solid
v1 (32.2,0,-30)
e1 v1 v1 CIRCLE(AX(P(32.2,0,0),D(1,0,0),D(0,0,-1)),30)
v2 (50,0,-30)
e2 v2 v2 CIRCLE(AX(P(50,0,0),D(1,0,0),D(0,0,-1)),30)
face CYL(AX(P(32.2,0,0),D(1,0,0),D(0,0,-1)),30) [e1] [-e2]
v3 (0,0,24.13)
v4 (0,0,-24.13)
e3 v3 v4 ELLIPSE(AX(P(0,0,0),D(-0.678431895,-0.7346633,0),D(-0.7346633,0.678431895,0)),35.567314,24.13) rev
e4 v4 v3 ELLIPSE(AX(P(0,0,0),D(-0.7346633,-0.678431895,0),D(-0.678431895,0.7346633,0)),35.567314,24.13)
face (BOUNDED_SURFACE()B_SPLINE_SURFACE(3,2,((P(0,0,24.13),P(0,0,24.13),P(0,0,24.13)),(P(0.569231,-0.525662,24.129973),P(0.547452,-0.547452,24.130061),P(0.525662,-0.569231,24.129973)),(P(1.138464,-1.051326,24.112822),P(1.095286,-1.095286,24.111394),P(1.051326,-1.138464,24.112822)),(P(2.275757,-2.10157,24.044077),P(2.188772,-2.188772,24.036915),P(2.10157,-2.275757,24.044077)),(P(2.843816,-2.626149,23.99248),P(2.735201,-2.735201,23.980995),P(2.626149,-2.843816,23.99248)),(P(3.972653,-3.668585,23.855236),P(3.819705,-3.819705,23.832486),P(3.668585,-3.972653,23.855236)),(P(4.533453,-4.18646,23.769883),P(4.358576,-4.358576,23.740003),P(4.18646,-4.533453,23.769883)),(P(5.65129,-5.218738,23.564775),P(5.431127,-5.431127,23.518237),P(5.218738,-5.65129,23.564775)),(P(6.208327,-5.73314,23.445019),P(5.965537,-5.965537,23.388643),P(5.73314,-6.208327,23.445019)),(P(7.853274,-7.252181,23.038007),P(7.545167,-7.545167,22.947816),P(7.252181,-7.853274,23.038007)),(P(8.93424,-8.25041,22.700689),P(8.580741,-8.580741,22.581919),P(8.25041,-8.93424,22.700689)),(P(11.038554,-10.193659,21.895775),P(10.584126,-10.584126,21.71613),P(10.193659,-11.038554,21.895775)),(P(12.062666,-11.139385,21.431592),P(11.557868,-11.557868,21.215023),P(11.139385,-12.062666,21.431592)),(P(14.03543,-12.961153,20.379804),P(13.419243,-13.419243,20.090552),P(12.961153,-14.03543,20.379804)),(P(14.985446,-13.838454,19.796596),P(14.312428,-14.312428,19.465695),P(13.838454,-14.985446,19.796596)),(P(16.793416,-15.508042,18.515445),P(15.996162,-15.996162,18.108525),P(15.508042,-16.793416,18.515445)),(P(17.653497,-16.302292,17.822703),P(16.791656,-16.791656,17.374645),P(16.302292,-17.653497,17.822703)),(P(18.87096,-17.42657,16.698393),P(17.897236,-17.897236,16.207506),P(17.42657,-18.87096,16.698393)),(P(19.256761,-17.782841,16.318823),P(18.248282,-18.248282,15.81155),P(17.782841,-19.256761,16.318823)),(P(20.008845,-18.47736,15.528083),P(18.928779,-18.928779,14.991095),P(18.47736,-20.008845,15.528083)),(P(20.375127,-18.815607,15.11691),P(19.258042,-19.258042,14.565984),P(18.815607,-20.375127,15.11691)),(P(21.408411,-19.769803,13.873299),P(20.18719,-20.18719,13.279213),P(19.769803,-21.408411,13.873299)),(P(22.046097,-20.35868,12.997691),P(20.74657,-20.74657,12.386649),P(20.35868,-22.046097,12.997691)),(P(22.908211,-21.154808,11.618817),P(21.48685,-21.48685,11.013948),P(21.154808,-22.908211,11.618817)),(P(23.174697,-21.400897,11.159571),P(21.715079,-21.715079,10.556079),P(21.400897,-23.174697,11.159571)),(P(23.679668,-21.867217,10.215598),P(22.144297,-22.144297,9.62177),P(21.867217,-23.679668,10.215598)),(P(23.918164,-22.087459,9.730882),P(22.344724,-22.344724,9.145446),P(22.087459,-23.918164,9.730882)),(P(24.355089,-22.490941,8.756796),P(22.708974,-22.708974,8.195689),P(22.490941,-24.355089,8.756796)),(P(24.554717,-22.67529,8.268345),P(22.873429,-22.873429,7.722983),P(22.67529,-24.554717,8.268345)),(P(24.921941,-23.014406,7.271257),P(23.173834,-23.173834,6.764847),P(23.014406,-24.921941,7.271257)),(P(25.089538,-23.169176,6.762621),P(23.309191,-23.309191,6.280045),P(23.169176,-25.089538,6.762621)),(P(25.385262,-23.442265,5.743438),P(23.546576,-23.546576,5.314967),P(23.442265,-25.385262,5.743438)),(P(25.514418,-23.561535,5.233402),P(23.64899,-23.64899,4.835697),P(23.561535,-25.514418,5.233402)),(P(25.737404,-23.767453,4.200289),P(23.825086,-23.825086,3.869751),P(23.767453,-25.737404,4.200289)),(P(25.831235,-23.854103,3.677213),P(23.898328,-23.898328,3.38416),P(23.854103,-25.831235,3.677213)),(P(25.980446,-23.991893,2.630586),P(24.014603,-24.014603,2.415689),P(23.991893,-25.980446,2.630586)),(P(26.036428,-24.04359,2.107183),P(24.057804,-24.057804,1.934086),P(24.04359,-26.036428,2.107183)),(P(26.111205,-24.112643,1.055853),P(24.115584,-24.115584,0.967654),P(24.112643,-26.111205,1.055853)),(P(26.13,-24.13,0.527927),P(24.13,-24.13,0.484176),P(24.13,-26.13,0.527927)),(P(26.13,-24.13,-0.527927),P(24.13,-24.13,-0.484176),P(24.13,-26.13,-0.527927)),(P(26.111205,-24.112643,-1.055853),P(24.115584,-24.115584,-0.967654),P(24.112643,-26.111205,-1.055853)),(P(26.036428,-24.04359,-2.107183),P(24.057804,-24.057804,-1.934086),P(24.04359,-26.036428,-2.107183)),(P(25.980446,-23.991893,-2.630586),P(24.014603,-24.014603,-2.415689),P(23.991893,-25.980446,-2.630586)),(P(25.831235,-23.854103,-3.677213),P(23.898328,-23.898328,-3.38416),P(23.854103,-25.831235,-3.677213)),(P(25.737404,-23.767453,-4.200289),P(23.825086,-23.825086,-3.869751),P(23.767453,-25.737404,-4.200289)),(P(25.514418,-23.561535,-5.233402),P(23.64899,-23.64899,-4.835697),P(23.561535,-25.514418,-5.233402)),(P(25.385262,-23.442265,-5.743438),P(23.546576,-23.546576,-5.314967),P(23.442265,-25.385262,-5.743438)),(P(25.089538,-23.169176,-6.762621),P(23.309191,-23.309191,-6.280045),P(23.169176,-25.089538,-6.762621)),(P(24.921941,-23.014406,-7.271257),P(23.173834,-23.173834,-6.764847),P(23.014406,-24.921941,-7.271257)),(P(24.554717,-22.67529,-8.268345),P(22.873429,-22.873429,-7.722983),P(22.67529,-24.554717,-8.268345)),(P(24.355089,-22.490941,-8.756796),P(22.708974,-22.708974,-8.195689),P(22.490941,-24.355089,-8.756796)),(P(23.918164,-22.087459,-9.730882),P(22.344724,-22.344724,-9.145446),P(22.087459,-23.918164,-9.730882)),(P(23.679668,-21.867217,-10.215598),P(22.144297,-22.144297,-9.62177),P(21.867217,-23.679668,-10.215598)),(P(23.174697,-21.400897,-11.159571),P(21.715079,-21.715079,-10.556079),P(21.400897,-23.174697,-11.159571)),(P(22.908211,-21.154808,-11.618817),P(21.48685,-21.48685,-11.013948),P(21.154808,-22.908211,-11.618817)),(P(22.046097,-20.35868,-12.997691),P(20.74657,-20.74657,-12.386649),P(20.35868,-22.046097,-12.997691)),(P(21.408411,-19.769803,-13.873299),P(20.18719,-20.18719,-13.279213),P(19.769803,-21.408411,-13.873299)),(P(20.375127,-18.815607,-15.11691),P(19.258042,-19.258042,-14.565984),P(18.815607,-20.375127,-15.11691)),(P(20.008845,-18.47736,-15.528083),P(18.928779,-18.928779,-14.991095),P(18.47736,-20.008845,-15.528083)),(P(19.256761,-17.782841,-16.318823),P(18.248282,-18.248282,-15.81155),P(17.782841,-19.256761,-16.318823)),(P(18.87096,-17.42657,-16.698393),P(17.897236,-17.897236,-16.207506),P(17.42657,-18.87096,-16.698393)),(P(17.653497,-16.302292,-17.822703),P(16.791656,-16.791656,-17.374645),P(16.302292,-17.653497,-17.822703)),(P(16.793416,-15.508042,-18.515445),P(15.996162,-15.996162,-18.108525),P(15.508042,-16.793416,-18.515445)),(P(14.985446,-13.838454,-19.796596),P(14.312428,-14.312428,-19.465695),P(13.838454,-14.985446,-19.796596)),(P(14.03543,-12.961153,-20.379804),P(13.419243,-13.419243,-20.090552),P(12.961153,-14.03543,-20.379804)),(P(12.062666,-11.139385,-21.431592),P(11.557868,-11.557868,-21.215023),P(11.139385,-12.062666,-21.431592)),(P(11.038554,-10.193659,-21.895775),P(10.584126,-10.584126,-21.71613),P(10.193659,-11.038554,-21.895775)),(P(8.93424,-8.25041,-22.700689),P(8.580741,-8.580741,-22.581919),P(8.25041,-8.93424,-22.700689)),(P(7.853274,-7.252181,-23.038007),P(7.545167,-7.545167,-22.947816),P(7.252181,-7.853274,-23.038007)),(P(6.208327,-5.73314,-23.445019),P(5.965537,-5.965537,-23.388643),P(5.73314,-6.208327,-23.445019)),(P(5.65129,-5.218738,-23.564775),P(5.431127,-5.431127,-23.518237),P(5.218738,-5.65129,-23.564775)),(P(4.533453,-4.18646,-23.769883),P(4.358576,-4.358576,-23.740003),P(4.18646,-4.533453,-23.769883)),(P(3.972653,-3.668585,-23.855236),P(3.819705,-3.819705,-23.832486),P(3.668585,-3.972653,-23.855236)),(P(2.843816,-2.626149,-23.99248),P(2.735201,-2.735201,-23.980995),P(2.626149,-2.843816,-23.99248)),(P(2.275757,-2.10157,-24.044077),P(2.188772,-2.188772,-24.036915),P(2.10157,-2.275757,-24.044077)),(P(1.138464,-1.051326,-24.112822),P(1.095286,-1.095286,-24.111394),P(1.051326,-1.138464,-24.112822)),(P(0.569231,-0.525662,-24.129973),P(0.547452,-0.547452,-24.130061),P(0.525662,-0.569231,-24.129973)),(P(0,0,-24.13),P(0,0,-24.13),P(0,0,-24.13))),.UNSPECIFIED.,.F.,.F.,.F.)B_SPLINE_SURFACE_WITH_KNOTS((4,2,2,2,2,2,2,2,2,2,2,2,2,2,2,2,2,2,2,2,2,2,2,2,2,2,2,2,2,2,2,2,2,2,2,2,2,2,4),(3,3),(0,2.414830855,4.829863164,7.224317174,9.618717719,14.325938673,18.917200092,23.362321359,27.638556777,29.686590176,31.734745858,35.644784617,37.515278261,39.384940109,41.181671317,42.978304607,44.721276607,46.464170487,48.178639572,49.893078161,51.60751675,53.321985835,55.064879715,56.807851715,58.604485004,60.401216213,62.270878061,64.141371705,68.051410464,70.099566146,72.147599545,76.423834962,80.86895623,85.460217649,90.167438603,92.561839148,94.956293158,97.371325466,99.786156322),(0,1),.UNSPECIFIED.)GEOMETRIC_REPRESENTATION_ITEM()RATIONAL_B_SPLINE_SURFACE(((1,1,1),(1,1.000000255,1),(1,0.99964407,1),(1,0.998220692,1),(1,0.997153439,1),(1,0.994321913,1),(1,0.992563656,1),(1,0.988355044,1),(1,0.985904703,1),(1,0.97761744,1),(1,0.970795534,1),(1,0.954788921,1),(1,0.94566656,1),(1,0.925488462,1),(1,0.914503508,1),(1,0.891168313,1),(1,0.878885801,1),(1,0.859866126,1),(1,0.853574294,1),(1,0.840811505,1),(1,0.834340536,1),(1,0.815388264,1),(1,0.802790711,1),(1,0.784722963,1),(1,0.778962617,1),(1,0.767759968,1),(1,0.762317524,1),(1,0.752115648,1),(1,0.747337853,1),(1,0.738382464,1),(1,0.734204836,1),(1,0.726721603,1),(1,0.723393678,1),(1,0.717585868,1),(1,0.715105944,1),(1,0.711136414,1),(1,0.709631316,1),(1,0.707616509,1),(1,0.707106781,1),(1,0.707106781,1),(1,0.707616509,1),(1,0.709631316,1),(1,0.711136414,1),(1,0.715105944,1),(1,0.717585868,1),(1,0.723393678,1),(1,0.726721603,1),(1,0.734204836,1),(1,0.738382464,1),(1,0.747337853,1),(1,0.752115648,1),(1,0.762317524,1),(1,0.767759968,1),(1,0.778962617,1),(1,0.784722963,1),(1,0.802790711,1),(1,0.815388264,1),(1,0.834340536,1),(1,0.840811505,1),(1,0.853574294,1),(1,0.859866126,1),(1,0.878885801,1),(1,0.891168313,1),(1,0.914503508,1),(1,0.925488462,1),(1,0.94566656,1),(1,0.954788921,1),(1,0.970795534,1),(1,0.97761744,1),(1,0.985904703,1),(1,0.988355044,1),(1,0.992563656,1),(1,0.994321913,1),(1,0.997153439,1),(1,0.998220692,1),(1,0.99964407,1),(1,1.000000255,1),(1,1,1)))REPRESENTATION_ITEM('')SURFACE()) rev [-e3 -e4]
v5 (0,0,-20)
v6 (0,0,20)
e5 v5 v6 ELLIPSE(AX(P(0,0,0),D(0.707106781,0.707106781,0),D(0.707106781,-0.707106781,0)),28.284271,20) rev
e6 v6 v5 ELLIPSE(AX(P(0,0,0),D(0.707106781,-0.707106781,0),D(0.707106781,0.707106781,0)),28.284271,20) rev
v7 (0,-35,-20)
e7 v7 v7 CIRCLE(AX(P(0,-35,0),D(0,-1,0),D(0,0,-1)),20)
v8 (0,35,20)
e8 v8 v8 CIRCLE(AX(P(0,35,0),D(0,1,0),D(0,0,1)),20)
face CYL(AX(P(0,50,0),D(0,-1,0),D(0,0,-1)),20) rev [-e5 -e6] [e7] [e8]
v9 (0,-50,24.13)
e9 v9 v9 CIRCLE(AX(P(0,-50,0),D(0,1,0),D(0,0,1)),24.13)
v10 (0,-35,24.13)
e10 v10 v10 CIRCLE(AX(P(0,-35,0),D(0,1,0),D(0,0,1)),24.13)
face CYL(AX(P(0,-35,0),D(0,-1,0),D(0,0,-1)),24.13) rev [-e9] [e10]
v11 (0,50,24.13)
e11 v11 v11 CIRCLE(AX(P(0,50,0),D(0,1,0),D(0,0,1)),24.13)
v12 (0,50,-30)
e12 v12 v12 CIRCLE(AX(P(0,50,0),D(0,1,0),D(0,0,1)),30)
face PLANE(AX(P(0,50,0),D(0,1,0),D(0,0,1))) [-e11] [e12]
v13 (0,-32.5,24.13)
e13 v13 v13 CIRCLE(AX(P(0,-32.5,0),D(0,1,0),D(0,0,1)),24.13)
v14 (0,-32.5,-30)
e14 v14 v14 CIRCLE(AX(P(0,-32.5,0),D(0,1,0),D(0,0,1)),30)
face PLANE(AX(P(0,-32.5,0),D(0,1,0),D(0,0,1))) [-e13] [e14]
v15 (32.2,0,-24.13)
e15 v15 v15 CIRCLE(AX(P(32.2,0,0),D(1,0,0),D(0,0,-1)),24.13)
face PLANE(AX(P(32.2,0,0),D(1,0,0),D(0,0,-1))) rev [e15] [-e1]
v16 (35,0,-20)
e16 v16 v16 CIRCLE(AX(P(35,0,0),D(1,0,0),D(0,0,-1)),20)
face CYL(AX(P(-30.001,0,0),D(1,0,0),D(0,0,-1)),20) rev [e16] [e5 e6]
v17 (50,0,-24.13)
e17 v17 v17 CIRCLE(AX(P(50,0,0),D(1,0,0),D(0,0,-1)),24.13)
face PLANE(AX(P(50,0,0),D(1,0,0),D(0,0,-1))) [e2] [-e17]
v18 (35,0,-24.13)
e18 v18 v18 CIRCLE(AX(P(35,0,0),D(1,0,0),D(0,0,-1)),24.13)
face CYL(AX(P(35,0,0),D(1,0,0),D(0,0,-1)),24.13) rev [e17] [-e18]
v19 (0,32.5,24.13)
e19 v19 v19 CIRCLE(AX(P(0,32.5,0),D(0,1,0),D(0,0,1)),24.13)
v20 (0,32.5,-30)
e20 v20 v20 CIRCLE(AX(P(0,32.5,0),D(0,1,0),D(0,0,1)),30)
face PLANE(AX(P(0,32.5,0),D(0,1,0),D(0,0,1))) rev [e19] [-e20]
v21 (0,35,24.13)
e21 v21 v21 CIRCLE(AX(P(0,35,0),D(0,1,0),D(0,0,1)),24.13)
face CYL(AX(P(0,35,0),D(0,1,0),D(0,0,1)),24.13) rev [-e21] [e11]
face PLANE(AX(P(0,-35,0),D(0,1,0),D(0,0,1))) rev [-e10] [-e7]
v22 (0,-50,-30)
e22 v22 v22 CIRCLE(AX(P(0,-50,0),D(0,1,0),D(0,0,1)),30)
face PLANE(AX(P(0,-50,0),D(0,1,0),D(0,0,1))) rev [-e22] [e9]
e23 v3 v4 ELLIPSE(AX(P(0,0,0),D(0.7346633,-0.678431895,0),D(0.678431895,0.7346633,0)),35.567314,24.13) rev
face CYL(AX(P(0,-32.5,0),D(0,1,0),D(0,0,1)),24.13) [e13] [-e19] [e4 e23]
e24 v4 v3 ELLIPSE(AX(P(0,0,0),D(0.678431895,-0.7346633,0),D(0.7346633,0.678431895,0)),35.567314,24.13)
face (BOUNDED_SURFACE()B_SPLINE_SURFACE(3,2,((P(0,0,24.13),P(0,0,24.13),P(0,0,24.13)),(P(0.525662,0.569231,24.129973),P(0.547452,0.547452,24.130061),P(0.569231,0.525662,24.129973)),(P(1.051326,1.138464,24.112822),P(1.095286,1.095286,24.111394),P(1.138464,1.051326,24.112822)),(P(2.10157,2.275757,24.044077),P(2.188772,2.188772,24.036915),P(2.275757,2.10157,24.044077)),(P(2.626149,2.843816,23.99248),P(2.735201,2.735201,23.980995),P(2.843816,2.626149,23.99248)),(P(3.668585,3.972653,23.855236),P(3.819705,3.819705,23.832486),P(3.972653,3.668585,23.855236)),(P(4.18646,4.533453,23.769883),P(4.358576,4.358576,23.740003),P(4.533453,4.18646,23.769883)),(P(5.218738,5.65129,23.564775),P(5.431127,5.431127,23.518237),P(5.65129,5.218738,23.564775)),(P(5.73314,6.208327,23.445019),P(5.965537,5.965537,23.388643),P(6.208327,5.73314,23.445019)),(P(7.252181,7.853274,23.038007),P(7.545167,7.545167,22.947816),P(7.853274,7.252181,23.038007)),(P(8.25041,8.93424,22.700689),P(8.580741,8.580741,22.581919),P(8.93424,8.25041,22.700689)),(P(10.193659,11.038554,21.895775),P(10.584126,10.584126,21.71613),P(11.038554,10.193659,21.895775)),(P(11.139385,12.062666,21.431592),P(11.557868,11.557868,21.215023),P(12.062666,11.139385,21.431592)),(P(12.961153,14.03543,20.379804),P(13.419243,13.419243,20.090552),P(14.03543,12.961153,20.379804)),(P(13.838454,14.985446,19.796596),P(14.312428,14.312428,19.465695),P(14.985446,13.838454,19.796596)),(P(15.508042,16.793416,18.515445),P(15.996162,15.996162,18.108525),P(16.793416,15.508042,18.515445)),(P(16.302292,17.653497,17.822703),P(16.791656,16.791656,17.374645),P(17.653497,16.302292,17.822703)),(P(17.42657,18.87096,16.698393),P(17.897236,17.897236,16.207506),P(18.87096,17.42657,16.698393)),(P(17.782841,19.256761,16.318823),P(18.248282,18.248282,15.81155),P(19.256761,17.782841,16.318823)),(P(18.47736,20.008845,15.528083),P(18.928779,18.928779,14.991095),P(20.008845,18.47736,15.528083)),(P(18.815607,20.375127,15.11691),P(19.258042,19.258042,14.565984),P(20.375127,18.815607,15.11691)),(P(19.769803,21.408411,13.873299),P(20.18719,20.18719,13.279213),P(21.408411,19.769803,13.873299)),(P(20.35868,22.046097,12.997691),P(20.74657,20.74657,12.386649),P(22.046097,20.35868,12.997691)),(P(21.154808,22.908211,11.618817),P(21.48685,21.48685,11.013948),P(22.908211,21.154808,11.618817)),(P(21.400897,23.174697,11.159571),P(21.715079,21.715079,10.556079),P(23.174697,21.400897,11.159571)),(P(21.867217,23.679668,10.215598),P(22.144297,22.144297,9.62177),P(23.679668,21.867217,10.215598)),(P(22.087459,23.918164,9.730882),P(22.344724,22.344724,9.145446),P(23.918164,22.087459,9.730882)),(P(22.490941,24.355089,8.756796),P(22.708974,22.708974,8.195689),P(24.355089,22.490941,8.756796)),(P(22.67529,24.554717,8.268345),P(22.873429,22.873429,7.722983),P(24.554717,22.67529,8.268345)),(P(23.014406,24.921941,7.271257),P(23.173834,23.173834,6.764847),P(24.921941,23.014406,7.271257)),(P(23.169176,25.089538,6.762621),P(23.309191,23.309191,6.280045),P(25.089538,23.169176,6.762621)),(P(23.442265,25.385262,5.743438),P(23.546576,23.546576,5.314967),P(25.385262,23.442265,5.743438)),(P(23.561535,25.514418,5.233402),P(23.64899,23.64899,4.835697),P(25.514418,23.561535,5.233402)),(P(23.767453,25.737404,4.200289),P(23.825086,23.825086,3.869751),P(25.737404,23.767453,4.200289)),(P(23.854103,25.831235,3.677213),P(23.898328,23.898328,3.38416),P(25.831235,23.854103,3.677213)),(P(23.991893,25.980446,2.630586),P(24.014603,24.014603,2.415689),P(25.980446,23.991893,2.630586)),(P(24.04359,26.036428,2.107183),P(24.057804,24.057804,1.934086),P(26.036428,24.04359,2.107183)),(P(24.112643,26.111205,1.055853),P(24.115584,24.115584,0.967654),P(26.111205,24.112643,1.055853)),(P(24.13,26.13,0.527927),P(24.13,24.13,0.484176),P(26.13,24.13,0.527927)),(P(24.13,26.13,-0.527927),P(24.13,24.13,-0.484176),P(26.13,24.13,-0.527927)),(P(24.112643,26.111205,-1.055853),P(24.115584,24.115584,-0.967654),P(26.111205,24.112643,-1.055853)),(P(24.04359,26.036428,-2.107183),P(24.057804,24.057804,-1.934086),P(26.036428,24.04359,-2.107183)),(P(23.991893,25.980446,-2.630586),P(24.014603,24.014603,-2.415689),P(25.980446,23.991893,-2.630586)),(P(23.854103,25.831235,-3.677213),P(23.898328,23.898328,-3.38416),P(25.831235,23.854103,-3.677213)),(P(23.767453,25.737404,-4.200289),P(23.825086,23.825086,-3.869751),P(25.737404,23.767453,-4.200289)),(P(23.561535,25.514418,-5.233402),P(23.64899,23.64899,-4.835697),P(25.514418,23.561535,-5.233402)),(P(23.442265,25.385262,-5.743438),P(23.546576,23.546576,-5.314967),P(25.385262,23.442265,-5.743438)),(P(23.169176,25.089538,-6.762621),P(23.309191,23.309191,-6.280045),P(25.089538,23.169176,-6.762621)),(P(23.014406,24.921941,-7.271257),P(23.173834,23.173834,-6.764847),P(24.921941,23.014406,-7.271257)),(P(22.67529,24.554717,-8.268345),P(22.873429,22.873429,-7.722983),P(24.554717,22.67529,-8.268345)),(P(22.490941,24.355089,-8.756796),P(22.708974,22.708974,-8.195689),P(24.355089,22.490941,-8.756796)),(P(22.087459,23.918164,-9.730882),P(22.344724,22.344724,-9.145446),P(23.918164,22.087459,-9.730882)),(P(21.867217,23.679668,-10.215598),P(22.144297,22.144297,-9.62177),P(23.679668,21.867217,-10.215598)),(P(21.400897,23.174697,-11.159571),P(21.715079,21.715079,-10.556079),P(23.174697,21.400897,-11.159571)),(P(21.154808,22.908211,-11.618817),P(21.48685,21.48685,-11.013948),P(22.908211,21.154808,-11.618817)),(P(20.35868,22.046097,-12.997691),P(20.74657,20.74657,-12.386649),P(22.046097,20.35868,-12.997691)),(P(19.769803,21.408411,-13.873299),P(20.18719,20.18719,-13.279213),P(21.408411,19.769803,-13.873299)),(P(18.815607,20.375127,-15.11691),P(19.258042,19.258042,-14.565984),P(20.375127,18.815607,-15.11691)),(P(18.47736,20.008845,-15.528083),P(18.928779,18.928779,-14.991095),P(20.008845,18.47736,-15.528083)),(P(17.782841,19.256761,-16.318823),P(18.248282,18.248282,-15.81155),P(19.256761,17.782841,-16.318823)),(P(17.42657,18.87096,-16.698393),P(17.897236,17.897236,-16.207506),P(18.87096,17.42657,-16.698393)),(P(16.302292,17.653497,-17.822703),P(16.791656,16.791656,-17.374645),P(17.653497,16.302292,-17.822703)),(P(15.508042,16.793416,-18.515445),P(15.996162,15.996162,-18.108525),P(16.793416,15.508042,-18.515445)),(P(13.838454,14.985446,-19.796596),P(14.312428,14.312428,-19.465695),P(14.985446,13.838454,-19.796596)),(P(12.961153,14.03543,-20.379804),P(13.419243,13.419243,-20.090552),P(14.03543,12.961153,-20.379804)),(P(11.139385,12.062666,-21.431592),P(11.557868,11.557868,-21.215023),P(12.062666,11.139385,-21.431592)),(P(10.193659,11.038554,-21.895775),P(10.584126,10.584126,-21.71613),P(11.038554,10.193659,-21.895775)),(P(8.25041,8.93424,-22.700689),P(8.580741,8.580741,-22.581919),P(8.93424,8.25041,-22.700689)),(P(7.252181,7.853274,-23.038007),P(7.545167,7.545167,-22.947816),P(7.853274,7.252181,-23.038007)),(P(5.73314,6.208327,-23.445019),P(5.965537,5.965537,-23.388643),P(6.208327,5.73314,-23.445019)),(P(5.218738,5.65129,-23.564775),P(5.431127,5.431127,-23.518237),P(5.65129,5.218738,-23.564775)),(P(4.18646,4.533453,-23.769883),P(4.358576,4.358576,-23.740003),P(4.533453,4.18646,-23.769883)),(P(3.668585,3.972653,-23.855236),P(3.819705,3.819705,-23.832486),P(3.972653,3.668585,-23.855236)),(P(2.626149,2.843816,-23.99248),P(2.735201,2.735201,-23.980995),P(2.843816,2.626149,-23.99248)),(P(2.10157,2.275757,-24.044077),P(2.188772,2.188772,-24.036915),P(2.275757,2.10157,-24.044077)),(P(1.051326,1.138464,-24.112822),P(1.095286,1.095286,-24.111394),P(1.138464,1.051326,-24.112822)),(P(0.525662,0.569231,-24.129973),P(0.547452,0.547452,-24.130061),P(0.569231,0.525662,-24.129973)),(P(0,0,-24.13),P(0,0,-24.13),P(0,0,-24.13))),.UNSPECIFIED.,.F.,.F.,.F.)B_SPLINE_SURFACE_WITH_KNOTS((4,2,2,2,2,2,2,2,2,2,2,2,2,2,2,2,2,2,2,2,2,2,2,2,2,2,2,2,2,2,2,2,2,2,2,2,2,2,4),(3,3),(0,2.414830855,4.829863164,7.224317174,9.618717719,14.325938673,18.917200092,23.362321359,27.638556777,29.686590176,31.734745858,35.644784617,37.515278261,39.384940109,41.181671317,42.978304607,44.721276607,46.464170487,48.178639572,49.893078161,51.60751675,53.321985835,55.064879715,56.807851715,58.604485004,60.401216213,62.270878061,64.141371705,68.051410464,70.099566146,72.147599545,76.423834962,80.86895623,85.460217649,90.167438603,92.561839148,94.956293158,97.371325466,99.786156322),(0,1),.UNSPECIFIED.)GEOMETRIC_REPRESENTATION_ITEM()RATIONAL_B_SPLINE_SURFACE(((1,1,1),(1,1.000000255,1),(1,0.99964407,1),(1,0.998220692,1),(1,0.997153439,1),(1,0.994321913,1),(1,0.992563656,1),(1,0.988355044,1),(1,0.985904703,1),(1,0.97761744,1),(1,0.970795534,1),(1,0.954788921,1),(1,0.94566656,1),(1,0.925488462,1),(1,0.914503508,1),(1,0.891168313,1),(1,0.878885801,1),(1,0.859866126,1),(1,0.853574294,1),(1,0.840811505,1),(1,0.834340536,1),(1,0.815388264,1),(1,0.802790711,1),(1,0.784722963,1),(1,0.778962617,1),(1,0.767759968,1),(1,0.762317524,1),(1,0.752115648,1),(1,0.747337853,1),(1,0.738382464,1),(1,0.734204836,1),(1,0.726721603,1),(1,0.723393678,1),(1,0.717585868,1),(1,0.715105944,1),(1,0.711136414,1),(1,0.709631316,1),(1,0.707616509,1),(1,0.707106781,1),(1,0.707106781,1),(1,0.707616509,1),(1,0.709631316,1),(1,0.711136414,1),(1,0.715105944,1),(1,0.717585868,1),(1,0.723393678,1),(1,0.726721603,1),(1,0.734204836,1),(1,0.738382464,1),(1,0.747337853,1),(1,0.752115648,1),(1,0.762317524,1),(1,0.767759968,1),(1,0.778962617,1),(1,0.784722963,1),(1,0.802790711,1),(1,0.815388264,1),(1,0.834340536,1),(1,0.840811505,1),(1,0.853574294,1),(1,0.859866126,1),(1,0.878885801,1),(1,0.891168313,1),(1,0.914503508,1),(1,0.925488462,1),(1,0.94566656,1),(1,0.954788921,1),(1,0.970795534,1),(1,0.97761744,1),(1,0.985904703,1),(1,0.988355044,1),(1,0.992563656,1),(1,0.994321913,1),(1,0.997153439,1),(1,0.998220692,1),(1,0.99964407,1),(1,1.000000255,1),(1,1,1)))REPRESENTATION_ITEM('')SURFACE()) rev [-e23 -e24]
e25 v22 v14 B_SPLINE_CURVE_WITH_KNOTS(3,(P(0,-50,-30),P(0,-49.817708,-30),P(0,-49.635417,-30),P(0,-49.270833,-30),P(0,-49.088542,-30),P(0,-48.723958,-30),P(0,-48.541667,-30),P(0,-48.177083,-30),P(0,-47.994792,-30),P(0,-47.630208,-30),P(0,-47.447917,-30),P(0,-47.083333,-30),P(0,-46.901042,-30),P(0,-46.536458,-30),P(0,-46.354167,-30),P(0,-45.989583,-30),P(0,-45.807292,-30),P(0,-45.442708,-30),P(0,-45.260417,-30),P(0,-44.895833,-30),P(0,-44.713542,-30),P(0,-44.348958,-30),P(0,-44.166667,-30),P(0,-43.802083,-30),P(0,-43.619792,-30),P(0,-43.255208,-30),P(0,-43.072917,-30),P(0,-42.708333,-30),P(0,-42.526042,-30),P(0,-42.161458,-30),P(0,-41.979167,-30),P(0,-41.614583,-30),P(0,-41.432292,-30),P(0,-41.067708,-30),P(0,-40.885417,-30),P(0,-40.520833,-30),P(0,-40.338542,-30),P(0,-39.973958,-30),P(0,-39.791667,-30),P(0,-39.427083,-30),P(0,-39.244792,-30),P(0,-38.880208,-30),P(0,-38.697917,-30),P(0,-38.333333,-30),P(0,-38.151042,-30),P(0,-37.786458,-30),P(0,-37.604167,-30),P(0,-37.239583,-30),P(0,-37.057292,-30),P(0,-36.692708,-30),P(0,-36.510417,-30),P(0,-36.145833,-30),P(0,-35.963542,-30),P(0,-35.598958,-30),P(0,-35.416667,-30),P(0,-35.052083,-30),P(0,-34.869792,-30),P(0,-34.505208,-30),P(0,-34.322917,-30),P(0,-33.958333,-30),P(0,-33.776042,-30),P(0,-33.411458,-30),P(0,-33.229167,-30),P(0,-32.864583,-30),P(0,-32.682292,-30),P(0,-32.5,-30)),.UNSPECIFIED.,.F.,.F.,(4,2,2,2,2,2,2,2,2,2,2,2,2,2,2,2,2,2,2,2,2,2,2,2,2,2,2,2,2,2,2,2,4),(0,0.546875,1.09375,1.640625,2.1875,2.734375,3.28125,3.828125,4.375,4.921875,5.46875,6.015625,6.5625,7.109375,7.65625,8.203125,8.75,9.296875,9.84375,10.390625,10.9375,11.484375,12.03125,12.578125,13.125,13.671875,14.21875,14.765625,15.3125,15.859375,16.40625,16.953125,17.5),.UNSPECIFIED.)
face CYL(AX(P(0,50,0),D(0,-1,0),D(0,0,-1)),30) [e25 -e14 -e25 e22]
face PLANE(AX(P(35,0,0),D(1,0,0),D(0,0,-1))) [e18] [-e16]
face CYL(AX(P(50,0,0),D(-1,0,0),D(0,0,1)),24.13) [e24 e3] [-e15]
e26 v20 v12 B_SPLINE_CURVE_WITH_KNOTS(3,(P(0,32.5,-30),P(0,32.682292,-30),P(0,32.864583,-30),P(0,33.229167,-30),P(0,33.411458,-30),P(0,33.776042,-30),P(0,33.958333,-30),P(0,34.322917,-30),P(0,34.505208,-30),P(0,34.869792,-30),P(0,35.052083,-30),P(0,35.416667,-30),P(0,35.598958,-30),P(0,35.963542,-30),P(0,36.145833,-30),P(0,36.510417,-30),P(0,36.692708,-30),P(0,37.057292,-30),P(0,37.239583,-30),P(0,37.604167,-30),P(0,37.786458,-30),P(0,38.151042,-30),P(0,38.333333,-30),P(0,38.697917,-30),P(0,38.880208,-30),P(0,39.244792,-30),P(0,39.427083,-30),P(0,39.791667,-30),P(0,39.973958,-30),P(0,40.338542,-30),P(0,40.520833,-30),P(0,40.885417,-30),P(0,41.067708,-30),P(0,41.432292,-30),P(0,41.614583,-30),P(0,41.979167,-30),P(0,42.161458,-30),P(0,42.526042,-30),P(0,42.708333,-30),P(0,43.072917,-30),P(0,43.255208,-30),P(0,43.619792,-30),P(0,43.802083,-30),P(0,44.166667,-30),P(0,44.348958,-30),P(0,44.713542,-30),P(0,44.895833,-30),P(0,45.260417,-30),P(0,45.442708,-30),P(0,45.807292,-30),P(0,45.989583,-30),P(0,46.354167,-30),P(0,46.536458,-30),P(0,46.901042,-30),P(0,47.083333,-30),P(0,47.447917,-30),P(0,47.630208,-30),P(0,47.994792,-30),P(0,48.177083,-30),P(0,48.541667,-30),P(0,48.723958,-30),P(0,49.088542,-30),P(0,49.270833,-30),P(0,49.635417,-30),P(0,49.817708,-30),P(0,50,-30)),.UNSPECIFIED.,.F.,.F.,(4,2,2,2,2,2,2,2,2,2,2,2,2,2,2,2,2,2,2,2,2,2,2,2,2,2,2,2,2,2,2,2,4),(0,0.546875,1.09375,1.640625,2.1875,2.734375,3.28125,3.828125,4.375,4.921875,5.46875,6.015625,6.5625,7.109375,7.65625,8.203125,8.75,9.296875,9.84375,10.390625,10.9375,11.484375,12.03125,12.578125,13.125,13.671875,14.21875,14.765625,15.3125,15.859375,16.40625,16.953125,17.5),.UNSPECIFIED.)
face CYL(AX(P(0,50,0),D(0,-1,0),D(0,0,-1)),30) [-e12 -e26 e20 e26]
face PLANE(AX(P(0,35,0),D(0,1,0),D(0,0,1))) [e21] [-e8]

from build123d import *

# Parameters (mm, degrees)
CROQUIS1_R                 = 30
SALIENTE_EXTRUIR1_DEPTH    = 50
CROQUIS3_R                 = 24.13
CORTAR_EXTRUIR1_DEPTH      = 15
CORTAR_EXTRUIR2_START      = -85
CROQUIS3_2_R               = 24.13
CORTAR_EXTRUIR2_DEPTH      = 15
CROQUIS4_R                 = 30
CROQUIS4_R_2               = 24.13
CORTAR_EXTRUIR3_DEPTH      = 32.5
CROQUIS5_R                 = 24.13
SALIENTE_EXTRUIR2_DEPTH    = 50
CROQUIS6_R                 = 30
SALIENTE_EXTRUIR3_DEPTH    = 17.8
CORTAR_EXTRUIR4_START      = -15
CROQUIS7_R                 = 24.13
CORTAR_EXTRUIR4_DEPTH      = 15
CROQUIS9_R                 = 20
CORTAR_EXTRUIR5_DEPTH      = 104.07764064
REDONDEO1_R                = 2
CORTAR_EXTRUIR6_REACH      = 89.321
CORTAR_EXTRUIR6_END_RADIUS = 20
CROQUIS10_R                = 20


with BuildPart() as part:
    # Croquis1 → Saliente-Extruir1 (new, symmetric)
    with BuildSketch(Plane(origin=(0, 0, 0), x_dir=(1, 0, 0), z_dir=(0, 1, 0))):
        with Locations(Location((0, 0, 0), (0, 0, 90))):
            Circle(CROQUIS1_R)
    extrude(amount=SALIENTE_EXTRUIR1_DEPTH, both=True)

    # Croquis3 → Cortar-Extruir1 (cut)
    with BuildSketch(Plane(origin=(0, 50, 0), x_dir=(1, 0, 0), z_dir=(0, 1, 0))):
        with Locations(Location((0, 0, 0), (0, 0, 270))):
            Circle(CROQUIS3_R)
    extrude(amount=-CORTAR_EXTRUIR1_DEPTH, mode=Mode.SUBTRACT)

    # Croquis3<2> → Cortar-Extruir2 (cut)
    with BuildSketch(Plane(origin=(0, 50, 0), x_dir=(1, 0, 0), z_dir=(0, 1, 0)).offset(CORTAR_EXTRUIR2_START)):
        with Locations(Location((0, 0, 0), (0, 0, 270))):
            Circle(CROQUIS3_2_R)
    extrude(amount=-CORTAR_EXTRUIR2_DEPTH, mode=Mode.SUBTRACT)

    # Croquis4 → Cortar-Extruir3 (cut, symmetric)
    with BuildSketch(Plane(origin=(0, 0, 0), x_dir=(1, 0, 0), z_dir=(0, 1, 0))):
        with Locations(Location((0, 0, 0), (0, 0, 90))):
            Circle(CROQUIS4_R)
        with Locations(Location((0, 0, 0), (0, 0, 270))):
            Circle(CROQUIS4_R_2, mode=Mode.SUBTRACT)
    extrude(amount=CORTAR_EXTRUIR3_DEPTH, both=True, mode=Mode.SUBTRACT)

    # Croquis5 → Saliente-Extruir2 (add)
    with BuildSketch(Plane(origin=(0, 0, 0), x_dir=(0, 0, -1), z_dir=(1, 0, 0))):
        Circle(CROQUIS5_R)
    extrude(amount=SALIENTE_EXTRUIR2_DEPTH)

    # Croquis6 → Saliente-Extruir3 (add)
    with BuildSketch(Plane(origin=(50, 0, 0), x_dir=(0, 0, -1), z_dir=(1, 0, 0))):
        Circle(CROQUIS6_R)
    extrude(amount=-SALIENTE_EXTRUIR3_DEPTH)

    # Croquis7 → Cortar-Extruir4 (cut)
    with BuildSketch(Plane(origin=(50, 0, 0), x_dir=(0, 0, -1), z_dir=(1, 0, 0)).offset(CORTAR_EXTRUIR4_START)):
        Circle(CROQUIS7_R)
    extrude(amount=CORTAR_EXTRUIR4_DEPTH, mode=Mode.SUBTRACT)

    # Croquis9 → Cortar-Extruir5 (cut, through all)
    with BuildSketch(Plane.XZ.offset(35)):
        with Locations(Location((0, 0, 0), (0, 0, 270))):
            Circle(CROQUIS9_R)
    extrude(amount=-CORTAR_EXTRUIR5_DEPTH, mode=Mode.SUBTRACT)

    # Redondeo1
    redondeo1_edges = [part.edges().sort_by_distance(p)[0] for p in [
        (15.589160136, -15.589160136, -18.418332885),
        (24.13, 24.13, 2.6592e-05),
    ]]
    fillet(redondeo1_edges, radius=REDONDEO1_R)

    # Cortar-Extruir6: up to this cylinder (the profile starts outside it)
    cortar_extruir6_end = Plane(origin=(0, 0, 0), z_dir=(0, -1, 0)) * Cylinder(CORTAR_EXTRUIR6_END_RADIUS, 219.642, mode=Mode.PRIVATE)
    # Croquis10 → Cortar-Extruir6 (cut, up to the surface)
    with BuildSketch(Plane(origin=(35, 0, 0), x_dir=(0, 0, -1), z_dir=(1, 0, 0)), mode=Mode.PRIVATE) as cortar_extruir6_sk1:
        Circle(CROQUIS10_R)
    cortar_extruir6_tool1 = extrude(cortar_extruir6_sk1.sketch, amount=-CORTAR_EXTRUIR6_REACH, mode=Mode.PRIVATE) - cortar_extruir6_end
    add(cortar_extruir6_tool1.solids().sort_by_distance((35, 0, 0))[0], mode=Mode.SUBTRACT)


solid = part.part
